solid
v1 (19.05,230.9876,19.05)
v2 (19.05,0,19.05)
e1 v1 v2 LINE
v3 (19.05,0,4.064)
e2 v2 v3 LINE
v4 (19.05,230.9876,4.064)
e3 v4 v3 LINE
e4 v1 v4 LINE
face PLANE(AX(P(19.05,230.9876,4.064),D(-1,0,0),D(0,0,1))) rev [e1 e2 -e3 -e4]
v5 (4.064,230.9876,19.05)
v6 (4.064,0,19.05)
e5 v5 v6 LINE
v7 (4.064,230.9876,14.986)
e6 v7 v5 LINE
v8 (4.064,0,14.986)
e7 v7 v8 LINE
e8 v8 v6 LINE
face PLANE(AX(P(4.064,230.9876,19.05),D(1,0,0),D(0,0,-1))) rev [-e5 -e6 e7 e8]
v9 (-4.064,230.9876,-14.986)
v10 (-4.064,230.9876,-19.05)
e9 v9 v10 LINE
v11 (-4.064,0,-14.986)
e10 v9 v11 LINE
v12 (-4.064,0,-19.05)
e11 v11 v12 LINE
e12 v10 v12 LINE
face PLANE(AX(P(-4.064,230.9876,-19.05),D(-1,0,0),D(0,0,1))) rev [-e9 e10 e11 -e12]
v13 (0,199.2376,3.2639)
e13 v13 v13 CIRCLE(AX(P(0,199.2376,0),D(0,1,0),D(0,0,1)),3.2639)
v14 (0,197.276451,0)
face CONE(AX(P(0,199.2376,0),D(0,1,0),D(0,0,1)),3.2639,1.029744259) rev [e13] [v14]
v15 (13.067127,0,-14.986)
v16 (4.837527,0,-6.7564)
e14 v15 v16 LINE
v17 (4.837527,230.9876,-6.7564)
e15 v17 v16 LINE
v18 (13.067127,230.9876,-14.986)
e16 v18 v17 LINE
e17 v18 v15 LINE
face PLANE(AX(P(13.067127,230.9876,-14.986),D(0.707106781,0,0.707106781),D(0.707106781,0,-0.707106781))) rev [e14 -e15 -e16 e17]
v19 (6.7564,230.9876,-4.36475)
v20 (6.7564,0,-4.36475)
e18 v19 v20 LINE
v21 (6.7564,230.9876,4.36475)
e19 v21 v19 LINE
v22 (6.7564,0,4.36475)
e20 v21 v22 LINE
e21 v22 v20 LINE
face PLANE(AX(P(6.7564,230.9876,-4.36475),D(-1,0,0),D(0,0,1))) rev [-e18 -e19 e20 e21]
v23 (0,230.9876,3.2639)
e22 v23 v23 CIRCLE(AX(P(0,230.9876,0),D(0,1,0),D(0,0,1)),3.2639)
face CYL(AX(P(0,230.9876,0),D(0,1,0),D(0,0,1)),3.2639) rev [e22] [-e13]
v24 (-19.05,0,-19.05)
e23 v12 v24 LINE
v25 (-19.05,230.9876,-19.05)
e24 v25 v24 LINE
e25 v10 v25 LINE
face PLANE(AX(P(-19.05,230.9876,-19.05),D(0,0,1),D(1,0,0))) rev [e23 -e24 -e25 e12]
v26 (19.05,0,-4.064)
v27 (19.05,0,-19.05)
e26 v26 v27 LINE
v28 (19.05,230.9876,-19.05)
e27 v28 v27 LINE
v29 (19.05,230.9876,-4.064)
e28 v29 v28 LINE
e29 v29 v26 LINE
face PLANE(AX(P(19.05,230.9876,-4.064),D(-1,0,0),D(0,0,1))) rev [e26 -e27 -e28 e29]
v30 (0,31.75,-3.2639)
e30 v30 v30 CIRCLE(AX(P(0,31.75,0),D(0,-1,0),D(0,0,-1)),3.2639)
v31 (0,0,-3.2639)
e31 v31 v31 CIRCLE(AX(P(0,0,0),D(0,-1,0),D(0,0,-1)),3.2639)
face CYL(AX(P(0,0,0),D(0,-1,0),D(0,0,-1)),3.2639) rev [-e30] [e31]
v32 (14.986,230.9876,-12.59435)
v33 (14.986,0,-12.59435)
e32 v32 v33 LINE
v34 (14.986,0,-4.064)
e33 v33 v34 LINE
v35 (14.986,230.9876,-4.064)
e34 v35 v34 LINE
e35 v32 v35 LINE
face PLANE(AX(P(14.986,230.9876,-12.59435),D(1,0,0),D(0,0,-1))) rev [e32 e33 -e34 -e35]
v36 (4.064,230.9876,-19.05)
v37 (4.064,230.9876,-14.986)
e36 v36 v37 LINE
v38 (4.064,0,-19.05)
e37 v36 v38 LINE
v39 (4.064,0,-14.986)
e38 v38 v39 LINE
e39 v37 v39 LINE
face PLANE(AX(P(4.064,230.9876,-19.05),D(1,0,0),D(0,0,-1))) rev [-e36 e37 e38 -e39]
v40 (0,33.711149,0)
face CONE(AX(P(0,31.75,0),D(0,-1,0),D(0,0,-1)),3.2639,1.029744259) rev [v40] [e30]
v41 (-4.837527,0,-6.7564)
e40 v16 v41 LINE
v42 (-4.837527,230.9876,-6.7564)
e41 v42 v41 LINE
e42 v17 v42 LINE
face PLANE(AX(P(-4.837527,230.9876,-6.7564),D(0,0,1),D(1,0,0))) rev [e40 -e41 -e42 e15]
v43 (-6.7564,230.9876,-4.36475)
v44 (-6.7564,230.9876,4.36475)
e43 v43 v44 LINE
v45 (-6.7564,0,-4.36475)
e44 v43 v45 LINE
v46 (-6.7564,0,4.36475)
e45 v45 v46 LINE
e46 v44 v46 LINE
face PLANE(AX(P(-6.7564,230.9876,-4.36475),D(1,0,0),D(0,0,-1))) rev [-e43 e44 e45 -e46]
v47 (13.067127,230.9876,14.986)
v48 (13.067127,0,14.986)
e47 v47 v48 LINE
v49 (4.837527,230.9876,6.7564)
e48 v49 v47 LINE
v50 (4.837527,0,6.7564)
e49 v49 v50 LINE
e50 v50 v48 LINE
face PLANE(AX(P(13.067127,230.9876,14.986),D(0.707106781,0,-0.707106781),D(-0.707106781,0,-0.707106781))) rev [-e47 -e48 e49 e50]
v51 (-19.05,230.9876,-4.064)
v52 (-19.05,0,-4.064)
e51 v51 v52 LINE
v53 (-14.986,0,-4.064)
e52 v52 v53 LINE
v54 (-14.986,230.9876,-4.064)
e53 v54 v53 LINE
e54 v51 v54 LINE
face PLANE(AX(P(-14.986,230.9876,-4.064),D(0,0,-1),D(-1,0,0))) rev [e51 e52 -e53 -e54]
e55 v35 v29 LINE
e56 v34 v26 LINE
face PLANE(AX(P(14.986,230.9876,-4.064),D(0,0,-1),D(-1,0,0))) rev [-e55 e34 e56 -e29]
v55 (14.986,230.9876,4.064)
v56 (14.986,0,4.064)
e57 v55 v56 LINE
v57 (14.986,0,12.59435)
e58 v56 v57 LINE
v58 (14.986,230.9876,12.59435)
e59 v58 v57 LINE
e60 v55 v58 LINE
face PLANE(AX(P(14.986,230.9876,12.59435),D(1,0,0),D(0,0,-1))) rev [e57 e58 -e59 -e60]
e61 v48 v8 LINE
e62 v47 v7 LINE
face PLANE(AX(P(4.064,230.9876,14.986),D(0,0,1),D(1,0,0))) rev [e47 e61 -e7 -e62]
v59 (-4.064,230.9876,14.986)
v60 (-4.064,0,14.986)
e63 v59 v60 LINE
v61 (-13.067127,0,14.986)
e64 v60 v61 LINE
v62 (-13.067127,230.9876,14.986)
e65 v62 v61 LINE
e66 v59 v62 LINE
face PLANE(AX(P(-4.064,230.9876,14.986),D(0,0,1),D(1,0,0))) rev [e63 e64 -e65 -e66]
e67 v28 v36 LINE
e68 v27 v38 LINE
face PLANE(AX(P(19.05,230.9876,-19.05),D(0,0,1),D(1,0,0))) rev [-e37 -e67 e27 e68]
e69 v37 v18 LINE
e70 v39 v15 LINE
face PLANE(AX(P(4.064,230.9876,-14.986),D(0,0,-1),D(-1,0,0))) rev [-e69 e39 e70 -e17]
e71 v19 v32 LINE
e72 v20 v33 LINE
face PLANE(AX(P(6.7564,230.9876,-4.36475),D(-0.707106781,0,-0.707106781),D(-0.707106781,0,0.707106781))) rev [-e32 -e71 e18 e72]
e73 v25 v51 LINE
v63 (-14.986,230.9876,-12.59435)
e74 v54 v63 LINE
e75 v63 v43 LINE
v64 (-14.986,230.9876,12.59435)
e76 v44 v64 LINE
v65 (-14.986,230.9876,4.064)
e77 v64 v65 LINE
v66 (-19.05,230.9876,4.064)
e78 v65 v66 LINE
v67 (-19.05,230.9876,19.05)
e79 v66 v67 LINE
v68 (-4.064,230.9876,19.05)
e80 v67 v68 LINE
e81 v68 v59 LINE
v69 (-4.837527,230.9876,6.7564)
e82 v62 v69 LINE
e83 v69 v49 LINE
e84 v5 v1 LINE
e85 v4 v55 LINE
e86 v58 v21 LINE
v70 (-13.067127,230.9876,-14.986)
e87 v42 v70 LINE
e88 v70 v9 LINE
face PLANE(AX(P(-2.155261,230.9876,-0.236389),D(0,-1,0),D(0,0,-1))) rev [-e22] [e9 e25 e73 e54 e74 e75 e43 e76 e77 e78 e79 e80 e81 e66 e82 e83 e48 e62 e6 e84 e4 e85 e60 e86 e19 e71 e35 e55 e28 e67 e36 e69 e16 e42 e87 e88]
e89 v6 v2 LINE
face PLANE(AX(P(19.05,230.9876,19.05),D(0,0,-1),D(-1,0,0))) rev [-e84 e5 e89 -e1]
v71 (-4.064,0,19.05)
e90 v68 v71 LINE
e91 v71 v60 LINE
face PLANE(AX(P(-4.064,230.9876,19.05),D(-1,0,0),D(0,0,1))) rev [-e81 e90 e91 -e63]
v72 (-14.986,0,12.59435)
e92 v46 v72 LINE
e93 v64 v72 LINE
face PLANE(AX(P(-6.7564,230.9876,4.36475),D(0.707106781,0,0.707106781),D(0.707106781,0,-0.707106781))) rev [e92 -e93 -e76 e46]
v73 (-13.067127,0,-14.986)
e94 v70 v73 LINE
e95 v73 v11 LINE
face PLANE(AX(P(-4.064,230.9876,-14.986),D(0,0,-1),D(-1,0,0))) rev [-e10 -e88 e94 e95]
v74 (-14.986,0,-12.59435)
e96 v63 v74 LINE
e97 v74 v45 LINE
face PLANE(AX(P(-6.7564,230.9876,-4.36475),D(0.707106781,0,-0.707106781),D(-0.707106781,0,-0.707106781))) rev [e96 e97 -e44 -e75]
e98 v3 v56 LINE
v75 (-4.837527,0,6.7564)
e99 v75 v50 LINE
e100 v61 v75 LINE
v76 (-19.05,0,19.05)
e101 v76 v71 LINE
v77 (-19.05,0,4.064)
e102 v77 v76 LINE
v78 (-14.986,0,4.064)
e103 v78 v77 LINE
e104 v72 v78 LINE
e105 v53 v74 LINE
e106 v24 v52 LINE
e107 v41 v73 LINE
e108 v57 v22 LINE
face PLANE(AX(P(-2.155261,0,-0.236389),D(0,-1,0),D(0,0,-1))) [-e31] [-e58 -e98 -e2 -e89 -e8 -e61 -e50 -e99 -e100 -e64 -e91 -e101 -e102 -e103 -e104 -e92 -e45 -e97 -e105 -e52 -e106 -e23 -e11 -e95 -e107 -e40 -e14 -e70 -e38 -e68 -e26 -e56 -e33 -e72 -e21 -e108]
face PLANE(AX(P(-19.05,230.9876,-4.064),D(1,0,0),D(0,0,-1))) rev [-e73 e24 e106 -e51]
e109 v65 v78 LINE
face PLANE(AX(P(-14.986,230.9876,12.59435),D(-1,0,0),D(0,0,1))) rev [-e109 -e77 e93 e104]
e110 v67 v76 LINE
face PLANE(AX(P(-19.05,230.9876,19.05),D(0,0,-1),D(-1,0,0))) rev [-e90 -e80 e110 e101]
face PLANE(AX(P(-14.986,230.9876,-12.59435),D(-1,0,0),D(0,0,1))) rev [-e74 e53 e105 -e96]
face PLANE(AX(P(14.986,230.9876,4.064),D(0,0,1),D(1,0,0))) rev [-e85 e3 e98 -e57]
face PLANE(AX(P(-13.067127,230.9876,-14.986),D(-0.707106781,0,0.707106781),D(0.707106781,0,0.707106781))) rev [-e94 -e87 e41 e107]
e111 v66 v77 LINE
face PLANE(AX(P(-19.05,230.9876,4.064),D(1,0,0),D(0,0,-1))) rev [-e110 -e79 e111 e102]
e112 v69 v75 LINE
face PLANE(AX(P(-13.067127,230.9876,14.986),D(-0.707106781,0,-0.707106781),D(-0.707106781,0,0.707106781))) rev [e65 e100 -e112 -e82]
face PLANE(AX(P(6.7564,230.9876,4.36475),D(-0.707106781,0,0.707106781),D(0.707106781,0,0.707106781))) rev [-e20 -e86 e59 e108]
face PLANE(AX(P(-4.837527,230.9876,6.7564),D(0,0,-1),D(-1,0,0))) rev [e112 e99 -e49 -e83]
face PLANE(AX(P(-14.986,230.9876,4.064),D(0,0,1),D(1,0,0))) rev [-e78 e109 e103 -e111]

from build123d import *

# Parameters (mm, degrees)
EXTRUDE1_DEPTH = 230.9876


# Read off the part's stored shape, not the designer's step: 1515<1>
with BuildPart() as part:
    # Sketch1<2> → Extrude1 (new body)
    with BuildSketch(Plane(origin=(0, 0, 0), x_dir=(1, 0, 0), z_dir=(0, 1, 0))):
        Polygon((-6.7564, 4.364749804), (-6.7564, -4.364749804), (-14.986, -12.594349804), (-14.986, -4.064), (-19.05, -4.064), (-19.05, -19.05), (-4.064, -19.05), (-4.064, -14.986), (-13.067127258, -14.986), (-4.837527258, -6.7564), (4.837527258, -6.7564), (13.067127258, -14.986), (4.064, -14.986), (4.064, -19.05), (19.05, -19.05), (19.05, -4.064), (14.986, -4.064), (14.986, -12.594349804), (6.7564, -4.364749804), (6.7564, 4.364749804), (14.986, 12.594349804), (14.986, 4.064), (19.05, 4.064), (19.05, 19.05), (4.064, 19.05), (4.064, 14.986), (13.067127258, 14.986), (4.837527258, 6.7564), (-4.837527258, 6.7564), (-13.067127258, 14.986), (-4.064, 14.986), (-4.064, 19.05), (-19.05, 19.05), (-19.05, 4.064), (-14.986, 4.064), (-14.986, 12.594349804), align=None)
    extrude(amount=EXTRUDE1_DEPTH)

    # Sketch2 → 5/16-18 Tapped Hole1 (revolve, cut)
    with BuildSketch(Plane(origin=(0, 230.9876, 0), x_dir=(0, 0, 1), z_dir=(1, 0, 0))):
        Polygon((0, 0), (0, 33.711148974), (3.2639, 31.75), (3.2639, 0), align=None)
    f_5_16_18_tapped_hole1 = revolve(axis=Axis((0, 237.3376, 0), (0, -1, 0)), mode=Mode.SUBTRACT)

    # Mirror1: 5/16-18 Tapped Hole1 across plane
    add(f_5_16_18_tapped_hole1.mirror(Plane.ZX.offset(115.4938)), mode=Mode.SUBTRACT)


solid = part.part
